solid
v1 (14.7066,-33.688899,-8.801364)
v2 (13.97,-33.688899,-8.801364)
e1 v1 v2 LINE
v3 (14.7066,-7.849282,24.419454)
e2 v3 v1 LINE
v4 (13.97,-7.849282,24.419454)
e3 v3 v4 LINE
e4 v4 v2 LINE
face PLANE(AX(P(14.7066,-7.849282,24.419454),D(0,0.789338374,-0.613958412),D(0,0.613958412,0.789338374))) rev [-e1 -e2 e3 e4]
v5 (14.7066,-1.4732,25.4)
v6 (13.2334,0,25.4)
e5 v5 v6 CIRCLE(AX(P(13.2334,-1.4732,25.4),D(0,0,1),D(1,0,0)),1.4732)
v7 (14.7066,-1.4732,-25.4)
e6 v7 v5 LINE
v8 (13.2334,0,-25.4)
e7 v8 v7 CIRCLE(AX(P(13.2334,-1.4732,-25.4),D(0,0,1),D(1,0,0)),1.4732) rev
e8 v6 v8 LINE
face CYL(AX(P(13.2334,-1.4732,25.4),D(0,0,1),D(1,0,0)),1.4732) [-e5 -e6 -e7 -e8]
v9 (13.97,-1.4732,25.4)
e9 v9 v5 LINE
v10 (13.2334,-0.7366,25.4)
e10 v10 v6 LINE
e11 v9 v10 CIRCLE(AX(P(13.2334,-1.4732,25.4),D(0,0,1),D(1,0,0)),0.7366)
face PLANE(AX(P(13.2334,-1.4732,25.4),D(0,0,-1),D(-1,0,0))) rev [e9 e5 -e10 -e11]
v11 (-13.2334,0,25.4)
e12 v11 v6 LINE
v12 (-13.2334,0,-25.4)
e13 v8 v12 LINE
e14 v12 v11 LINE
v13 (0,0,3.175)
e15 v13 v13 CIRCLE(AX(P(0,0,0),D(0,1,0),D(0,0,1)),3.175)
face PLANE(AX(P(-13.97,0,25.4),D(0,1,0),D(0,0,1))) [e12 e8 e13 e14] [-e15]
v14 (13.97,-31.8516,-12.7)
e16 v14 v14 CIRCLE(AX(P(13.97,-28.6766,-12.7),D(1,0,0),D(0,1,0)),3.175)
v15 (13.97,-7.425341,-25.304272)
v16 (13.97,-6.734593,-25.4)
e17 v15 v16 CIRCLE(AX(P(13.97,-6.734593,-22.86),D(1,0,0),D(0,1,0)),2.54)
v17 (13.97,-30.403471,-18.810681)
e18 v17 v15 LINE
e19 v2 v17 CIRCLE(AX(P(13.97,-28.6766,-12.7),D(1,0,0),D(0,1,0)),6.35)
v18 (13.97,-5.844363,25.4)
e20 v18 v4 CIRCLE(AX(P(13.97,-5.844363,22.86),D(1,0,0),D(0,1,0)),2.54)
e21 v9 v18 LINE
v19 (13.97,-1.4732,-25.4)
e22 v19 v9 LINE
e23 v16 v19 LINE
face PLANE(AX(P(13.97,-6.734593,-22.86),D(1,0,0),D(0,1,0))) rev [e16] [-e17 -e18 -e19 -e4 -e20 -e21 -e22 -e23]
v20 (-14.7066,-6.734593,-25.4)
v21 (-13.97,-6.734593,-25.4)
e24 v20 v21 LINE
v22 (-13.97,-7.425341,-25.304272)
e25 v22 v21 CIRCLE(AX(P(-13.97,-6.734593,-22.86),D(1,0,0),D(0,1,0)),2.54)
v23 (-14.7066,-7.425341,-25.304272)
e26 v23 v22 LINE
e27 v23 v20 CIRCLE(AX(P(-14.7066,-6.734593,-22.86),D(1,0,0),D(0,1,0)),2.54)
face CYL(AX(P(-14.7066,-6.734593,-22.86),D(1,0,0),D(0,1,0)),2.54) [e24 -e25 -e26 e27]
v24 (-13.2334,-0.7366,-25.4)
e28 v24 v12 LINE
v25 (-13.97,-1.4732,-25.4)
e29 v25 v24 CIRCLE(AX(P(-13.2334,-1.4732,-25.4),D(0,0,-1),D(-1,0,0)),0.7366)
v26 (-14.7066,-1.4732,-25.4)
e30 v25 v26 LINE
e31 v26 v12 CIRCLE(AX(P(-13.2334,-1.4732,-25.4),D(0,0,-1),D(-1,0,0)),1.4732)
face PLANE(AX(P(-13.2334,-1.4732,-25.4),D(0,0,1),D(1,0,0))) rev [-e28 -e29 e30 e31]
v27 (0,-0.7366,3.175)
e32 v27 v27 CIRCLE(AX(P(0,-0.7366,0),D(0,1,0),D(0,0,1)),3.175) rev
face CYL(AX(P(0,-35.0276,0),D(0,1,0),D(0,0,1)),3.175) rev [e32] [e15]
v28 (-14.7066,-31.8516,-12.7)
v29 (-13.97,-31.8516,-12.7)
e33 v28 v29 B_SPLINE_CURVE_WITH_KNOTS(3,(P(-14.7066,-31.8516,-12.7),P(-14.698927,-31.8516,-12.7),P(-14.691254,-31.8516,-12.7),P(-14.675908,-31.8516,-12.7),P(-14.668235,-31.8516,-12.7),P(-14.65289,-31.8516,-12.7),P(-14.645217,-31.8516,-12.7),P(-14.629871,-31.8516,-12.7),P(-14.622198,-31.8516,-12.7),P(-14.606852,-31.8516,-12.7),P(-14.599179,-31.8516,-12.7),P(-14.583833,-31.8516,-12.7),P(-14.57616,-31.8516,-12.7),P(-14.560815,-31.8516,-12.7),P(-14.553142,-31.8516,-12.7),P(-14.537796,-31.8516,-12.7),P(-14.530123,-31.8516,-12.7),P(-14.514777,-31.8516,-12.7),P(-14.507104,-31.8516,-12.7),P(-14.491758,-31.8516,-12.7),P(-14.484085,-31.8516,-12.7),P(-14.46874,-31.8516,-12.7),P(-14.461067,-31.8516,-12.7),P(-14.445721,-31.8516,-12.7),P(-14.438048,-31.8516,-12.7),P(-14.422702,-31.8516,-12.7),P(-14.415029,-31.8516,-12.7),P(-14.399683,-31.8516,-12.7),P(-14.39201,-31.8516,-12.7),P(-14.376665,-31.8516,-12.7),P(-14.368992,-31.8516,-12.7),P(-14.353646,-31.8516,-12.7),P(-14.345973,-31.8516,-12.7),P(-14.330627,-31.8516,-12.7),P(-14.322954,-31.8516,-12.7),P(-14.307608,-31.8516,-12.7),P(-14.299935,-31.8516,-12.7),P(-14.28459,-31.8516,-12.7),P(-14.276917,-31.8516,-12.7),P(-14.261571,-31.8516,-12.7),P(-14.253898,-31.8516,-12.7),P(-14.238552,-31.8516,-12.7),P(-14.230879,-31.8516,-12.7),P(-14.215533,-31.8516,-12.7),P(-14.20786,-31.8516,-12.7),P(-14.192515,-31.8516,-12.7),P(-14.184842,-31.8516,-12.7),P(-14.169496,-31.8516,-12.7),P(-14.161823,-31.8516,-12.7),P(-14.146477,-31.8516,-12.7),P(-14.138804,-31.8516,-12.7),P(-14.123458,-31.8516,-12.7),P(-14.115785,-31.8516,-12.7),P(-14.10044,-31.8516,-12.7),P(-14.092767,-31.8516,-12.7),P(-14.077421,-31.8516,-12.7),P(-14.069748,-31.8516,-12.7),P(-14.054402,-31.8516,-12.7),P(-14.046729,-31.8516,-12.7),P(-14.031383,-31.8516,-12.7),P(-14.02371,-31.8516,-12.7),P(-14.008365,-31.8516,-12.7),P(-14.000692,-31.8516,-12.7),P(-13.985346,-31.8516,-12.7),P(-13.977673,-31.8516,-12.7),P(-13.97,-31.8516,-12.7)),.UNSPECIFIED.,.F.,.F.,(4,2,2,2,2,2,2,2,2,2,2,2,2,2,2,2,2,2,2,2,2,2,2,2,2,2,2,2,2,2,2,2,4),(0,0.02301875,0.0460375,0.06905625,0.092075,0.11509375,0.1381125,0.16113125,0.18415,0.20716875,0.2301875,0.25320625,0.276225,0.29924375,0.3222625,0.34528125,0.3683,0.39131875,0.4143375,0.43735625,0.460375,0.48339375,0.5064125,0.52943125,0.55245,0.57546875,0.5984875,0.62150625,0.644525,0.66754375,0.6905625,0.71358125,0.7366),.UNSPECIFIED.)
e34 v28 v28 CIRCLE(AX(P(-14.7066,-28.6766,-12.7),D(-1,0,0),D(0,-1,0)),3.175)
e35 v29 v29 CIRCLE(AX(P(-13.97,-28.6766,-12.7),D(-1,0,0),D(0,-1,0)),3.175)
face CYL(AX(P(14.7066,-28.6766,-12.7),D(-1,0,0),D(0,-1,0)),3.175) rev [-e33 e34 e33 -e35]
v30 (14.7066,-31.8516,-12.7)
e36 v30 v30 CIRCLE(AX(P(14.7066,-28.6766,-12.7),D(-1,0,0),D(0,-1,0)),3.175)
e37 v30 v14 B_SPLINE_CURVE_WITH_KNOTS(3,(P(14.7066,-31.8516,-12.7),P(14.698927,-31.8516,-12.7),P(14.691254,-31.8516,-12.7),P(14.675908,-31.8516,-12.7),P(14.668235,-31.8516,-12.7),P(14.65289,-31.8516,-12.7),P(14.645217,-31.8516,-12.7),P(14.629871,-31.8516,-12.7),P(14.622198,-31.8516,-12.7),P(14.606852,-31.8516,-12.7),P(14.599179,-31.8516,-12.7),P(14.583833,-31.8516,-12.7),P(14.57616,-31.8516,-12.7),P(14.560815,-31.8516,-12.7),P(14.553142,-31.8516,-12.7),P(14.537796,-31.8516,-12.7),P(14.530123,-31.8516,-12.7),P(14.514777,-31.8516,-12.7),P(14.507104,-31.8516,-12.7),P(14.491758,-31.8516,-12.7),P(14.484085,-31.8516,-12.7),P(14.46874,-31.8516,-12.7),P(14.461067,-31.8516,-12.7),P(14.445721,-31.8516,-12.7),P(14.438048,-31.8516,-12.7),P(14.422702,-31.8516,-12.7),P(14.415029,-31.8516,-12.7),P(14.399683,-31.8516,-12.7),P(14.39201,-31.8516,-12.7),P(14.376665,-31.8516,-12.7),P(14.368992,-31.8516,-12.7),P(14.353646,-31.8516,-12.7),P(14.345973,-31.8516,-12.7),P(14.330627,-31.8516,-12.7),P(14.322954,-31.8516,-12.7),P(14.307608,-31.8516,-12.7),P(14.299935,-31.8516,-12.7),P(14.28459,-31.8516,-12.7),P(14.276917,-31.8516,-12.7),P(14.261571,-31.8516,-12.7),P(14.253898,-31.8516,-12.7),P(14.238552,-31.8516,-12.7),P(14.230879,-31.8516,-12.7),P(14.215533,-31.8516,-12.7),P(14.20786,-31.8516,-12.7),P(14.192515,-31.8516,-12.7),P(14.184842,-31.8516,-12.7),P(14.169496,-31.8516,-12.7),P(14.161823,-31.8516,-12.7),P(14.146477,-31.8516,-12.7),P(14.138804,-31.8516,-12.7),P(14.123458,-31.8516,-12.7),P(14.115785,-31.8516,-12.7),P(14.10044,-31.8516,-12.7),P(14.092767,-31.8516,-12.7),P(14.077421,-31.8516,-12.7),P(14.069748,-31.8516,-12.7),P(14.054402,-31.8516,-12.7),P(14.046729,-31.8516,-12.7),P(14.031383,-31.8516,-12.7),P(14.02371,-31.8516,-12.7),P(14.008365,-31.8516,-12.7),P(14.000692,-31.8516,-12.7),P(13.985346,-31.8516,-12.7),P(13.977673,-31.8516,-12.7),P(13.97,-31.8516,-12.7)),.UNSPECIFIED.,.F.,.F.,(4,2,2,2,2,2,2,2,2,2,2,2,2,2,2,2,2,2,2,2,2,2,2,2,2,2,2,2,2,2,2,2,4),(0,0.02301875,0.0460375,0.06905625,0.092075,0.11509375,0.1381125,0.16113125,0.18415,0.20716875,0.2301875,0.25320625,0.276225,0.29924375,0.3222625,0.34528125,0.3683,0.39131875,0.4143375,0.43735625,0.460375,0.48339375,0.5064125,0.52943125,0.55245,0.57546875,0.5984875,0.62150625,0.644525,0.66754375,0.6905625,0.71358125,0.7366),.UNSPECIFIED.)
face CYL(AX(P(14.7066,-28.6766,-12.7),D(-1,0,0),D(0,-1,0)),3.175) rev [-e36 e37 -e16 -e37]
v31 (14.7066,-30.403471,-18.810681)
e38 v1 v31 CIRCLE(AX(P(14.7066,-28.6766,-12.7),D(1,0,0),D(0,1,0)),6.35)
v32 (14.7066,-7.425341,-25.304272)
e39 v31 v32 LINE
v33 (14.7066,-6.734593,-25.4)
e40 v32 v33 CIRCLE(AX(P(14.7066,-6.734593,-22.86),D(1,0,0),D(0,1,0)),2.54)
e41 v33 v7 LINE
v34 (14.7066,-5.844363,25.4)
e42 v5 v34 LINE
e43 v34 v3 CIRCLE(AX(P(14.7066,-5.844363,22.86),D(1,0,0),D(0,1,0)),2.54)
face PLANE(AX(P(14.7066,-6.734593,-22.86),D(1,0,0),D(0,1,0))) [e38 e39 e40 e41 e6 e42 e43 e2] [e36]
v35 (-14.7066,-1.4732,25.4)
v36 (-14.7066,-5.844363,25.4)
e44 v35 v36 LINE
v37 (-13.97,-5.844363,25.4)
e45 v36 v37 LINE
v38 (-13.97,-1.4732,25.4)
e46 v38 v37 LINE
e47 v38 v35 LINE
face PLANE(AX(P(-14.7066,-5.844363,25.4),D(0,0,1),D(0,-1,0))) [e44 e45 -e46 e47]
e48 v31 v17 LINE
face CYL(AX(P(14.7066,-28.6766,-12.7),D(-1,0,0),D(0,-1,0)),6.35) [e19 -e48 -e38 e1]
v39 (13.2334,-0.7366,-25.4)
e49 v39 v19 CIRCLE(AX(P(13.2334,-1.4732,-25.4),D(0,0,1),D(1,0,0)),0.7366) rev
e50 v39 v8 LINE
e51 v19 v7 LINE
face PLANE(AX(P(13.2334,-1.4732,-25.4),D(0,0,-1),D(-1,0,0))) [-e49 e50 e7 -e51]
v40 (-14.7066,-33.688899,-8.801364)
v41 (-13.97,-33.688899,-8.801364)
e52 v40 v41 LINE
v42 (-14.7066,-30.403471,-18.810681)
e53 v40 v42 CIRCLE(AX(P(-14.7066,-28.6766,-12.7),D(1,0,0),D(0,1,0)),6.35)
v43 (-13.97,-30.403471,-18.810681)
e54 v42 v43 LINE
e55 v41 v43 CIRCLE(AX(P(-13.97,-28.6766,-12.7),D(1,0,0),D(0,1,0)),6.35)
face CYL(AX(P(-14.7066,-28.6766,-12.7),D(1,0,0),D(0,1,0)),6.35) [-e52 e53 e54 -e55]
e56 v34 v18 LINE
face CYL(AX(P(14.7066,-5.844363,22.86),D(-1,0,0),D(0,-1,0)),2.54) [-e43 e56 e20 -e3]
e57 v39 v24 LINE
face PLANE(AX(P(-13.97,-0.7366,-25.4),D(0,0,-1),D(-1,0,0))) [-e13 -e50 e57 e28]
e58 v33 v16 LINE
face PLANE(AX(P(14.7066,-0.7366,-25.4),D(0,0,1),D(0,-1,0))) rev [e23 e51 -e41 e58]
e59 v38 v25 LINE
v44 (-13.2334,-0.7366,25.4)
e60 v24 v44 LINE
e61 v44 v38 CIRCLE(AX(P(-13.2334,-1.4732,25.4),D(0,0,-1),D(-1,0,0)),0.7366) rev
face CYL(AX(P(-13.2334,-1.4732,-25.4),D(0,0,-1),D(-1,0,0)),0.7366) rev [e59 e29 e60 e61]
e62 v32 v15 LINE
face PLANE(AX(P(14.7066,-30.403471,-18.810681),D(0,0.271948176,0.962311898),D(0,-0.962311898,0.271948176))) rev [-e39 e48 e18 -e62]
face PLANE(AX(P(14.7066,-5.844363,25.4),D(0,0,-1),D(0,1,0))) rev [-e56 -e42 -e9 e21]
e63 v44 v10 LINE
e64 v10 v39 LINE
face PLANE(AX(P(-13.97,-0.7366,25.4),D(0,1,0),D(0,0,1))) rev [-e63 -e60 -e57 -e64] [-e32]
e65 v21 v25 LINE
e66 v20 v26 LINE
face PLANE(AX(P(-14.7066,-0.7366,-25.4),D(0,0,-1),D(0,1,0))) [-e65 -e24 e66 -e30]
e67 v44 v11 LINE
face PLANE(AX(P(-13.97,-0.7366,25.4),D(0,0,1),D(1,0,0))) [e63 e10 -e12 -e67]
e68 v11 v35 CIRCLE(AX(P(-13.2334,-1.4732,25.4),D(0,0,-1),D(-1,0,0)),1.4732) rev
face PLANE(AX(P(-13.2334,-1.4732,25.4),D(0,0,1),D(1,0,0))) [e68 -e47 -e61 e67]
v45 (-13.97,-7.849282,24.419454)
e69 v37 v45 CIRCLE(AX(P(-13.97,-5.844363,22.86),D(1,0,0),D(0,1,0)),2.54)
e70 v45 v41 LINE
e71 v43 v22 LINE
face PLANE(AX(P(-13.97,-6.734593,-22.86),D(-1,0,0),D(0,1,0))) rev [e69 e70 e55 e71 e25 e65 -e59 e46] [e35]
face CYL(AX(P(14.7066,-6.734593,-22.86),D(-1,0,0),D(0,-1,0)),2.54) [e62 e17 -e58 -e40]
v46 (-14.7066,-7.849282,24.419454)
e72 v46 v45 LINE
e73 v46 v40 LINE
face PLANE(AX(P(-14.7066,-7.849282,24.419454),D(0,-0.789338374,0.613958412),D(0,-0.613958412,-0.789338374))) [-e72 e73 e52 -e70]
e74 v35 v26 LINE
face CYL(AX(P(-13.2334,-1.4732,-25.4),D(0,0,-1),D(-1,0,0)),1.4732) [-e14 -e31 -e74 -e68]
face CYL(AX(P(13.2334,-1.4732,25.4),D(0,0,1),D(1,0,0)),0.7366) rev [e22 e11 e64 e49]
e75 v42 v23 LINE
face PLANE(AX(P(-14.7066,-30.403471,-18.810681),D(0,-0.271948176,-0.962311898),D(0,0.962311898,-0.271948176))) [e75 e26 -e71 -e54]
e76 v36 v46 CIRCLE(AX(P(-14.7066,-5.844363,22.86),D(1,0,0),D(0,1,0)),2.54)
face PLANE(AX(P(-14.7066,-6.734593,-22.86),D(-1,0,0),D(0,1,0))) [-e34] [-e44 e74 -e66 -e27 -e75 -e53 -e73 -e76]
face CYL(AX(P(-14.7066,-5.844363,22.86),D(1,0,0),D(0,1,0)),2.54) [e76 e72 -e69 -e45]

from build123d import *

# Parameters (mm, degrees)
SKETCH1_W                    = 27.94
SKETCH1_H                    = 50.8
BASE_FLANGE1_DEPTH           = 0.7366
EDGE_FLANGE1_STRIP_W         = 4.4196
EDGE_FLANGE1_STRIP_H         = 0.7366
EDGE_FLANGE1_STRIP_CUT_DEPTH = 50.8
EDGE_FLANGE1_DEPTH           = 50.8
EDGE_FLANGE1_START           = 0.7366
EDGE_FLANGE1_FLAT_DEPTH      = 0.7366
SKETCH12_R                   = 3.175
CUT_EXTRUDE1_DEPTH           = 53.317865417
CUT_EXTRUDE2_REACH           = 47.698
SKETCH13_R                   = 3.175


# Sheet-metal steps are written as plain solids
with BuildPart() as part:
    # Sketch1 → Base-Flange1 (new body)
    with BuildSketch(Plane(origin=(0, 0, 0), x_dir=(1, 0, 0), z_dir=(0, 1, 0))):
        Rectangle(SKETCH1_W, SKETCH1_H)
    extrude(amount=-BASE_FLANGE1_DEPTH)

    # Edge-Flange1 strip (across the edge) → Edge-Flange1 strip cut (cut)
    with BuildSketch(Plane(origin=(13.97, -0.7366, -25.4), x_dir=(-1, 0, 0), z_dir=(0, 0, 1))):
        with Locations((-1.4732, -0.3683)):
            Rectangle(EDGE_FLANGE1_STRIP_W, EDGE_FLANGE1_STRIP_H)
    edge_flange1_strip_cut = extrude(amount=EDGE_FLANGE1_STRIP_CUT_DEPTH, mode=Mode.SUBTRACT)

    # Edge-Flange1 bend section (across the edge) → Edge-Flange1 (add)
    with BuildSketch(Plane(origin=(13.97, -0.7366, -25.4), x_dir=(-1, 0, 0), z_dir=(0, 0, 1))):
        with BuildLine():
            Line((-0.7366, 0.7366), (0, 0.7366))
            ThreePointArc((0, 0.7366), (0.215745145, 0.215745145), (0.7366, 0))
            Line((0.7366, 0), (0.7366, -0.7366))
            ThreePointArc((0.7366, -0.7366), (-0.30510971, -0.30510971), (-0.7366, 0.7366))
        make_face()
    edge_flange1 = extrude(amount=EDGE_FLANGE1_DEPTH)

    # Edge-Flange1 profile (on flange) → Edge-Flange1 flat (add)
    with BuildSketch(Plane(origin=(13.97, -0.7366, 0), x_dir=(0, 0, 1), z_dir=(1, 0, 0)).offset(EDGE_FLANGE1_START)):
        with BuildLine():
            Line((24.419454366, 7.112682089), (-8.801364085, 32.952298674))
            ThreePointArc((-8.801364085, 32.952298674), (-14.680352055, 33.973299739), (-18.810680555, 29.666870915))
            Line((-18.810680555, 29.666870915), (-25.304272222, 6.688740937))
            ThreePointArc((-25.304272222, 6.688740937), (-25.375954237, 6.346667603), (-25.4, 5.997992571))
            Line((-25.4, 5.997992571), (-25.4, 0.7366))
            Line((-25.4, 0.7366), (25.4, 0.7366))
            Line((25.4, 0.7366), (25.4, 5.10776262))
            ThreePointArc((25.4, 5.10776262), (25.141733342, 6.223689568), (24.419454366, 7.112682089))
        make_face()
    edge_flange1_flat = extrude(amount=-EDGE_FLANGE1_FLAT_DEPTH)

    # Mirror1: Edge-Flange1 strip cut, Edge-Flange1, Edge-Flange1 flat across plane
    add(edge_flange1_strip_cut.mirror(Plane(origin=(0, 0, 0), x_dir=(0, 0, 1), z_dir=(1, 0, 0))), mode=Mode.SUBTRACT)
    add(edge_flange1.mirror(Plane(origin=(0, 0, 0), x_dir=(0, 0, 1), z_dir=(1, 0, 0))))
    add(edge_flange1_flat.mirror(Plane(origin=(0, 0, 0), x_dir=(0, 0, 1), z_dir=(1, 0, 0))))

    # Sketch12 → Cut-Extrude1 (cut, through all)
    with BuildSketch(Plane.ZY.offset(14.7066)):
        with Locations(Location((-12.7, -28.6766, 0), (0, 0, 270))):
            Circle(SKETCH12_R)
    extrude(amount=-CUT_EXTRUDE1_DEPTH, mode=Mode.SUBTRACT)

    # Sketch13 → Cut-Extrude2 (cut, up to next)
    with BuildSketch(Plane(origin=(0, 0, 0), x_dir=(1, 0, 0), z_dir=(0, 1, 0)), mode=Mode.PRIVATE) as cut_extrude2_sk1:
        with Locations(Location((0, 0, 0), (0, 0, 270))):
            Circle(SKETCH13_R)
    cut_extrude2_tool1 = extrude(cut_extrude2_sk1.sketch, amount=-CUT_EXTRUDE2_REACH, mode=Mode.PRIVATE) & part.part
    add(cut_extrude2_tool1.solids().sort_by_distance((0, 0, 0))[0], mode=Mode.SUBTRACT)


solid = part.part
